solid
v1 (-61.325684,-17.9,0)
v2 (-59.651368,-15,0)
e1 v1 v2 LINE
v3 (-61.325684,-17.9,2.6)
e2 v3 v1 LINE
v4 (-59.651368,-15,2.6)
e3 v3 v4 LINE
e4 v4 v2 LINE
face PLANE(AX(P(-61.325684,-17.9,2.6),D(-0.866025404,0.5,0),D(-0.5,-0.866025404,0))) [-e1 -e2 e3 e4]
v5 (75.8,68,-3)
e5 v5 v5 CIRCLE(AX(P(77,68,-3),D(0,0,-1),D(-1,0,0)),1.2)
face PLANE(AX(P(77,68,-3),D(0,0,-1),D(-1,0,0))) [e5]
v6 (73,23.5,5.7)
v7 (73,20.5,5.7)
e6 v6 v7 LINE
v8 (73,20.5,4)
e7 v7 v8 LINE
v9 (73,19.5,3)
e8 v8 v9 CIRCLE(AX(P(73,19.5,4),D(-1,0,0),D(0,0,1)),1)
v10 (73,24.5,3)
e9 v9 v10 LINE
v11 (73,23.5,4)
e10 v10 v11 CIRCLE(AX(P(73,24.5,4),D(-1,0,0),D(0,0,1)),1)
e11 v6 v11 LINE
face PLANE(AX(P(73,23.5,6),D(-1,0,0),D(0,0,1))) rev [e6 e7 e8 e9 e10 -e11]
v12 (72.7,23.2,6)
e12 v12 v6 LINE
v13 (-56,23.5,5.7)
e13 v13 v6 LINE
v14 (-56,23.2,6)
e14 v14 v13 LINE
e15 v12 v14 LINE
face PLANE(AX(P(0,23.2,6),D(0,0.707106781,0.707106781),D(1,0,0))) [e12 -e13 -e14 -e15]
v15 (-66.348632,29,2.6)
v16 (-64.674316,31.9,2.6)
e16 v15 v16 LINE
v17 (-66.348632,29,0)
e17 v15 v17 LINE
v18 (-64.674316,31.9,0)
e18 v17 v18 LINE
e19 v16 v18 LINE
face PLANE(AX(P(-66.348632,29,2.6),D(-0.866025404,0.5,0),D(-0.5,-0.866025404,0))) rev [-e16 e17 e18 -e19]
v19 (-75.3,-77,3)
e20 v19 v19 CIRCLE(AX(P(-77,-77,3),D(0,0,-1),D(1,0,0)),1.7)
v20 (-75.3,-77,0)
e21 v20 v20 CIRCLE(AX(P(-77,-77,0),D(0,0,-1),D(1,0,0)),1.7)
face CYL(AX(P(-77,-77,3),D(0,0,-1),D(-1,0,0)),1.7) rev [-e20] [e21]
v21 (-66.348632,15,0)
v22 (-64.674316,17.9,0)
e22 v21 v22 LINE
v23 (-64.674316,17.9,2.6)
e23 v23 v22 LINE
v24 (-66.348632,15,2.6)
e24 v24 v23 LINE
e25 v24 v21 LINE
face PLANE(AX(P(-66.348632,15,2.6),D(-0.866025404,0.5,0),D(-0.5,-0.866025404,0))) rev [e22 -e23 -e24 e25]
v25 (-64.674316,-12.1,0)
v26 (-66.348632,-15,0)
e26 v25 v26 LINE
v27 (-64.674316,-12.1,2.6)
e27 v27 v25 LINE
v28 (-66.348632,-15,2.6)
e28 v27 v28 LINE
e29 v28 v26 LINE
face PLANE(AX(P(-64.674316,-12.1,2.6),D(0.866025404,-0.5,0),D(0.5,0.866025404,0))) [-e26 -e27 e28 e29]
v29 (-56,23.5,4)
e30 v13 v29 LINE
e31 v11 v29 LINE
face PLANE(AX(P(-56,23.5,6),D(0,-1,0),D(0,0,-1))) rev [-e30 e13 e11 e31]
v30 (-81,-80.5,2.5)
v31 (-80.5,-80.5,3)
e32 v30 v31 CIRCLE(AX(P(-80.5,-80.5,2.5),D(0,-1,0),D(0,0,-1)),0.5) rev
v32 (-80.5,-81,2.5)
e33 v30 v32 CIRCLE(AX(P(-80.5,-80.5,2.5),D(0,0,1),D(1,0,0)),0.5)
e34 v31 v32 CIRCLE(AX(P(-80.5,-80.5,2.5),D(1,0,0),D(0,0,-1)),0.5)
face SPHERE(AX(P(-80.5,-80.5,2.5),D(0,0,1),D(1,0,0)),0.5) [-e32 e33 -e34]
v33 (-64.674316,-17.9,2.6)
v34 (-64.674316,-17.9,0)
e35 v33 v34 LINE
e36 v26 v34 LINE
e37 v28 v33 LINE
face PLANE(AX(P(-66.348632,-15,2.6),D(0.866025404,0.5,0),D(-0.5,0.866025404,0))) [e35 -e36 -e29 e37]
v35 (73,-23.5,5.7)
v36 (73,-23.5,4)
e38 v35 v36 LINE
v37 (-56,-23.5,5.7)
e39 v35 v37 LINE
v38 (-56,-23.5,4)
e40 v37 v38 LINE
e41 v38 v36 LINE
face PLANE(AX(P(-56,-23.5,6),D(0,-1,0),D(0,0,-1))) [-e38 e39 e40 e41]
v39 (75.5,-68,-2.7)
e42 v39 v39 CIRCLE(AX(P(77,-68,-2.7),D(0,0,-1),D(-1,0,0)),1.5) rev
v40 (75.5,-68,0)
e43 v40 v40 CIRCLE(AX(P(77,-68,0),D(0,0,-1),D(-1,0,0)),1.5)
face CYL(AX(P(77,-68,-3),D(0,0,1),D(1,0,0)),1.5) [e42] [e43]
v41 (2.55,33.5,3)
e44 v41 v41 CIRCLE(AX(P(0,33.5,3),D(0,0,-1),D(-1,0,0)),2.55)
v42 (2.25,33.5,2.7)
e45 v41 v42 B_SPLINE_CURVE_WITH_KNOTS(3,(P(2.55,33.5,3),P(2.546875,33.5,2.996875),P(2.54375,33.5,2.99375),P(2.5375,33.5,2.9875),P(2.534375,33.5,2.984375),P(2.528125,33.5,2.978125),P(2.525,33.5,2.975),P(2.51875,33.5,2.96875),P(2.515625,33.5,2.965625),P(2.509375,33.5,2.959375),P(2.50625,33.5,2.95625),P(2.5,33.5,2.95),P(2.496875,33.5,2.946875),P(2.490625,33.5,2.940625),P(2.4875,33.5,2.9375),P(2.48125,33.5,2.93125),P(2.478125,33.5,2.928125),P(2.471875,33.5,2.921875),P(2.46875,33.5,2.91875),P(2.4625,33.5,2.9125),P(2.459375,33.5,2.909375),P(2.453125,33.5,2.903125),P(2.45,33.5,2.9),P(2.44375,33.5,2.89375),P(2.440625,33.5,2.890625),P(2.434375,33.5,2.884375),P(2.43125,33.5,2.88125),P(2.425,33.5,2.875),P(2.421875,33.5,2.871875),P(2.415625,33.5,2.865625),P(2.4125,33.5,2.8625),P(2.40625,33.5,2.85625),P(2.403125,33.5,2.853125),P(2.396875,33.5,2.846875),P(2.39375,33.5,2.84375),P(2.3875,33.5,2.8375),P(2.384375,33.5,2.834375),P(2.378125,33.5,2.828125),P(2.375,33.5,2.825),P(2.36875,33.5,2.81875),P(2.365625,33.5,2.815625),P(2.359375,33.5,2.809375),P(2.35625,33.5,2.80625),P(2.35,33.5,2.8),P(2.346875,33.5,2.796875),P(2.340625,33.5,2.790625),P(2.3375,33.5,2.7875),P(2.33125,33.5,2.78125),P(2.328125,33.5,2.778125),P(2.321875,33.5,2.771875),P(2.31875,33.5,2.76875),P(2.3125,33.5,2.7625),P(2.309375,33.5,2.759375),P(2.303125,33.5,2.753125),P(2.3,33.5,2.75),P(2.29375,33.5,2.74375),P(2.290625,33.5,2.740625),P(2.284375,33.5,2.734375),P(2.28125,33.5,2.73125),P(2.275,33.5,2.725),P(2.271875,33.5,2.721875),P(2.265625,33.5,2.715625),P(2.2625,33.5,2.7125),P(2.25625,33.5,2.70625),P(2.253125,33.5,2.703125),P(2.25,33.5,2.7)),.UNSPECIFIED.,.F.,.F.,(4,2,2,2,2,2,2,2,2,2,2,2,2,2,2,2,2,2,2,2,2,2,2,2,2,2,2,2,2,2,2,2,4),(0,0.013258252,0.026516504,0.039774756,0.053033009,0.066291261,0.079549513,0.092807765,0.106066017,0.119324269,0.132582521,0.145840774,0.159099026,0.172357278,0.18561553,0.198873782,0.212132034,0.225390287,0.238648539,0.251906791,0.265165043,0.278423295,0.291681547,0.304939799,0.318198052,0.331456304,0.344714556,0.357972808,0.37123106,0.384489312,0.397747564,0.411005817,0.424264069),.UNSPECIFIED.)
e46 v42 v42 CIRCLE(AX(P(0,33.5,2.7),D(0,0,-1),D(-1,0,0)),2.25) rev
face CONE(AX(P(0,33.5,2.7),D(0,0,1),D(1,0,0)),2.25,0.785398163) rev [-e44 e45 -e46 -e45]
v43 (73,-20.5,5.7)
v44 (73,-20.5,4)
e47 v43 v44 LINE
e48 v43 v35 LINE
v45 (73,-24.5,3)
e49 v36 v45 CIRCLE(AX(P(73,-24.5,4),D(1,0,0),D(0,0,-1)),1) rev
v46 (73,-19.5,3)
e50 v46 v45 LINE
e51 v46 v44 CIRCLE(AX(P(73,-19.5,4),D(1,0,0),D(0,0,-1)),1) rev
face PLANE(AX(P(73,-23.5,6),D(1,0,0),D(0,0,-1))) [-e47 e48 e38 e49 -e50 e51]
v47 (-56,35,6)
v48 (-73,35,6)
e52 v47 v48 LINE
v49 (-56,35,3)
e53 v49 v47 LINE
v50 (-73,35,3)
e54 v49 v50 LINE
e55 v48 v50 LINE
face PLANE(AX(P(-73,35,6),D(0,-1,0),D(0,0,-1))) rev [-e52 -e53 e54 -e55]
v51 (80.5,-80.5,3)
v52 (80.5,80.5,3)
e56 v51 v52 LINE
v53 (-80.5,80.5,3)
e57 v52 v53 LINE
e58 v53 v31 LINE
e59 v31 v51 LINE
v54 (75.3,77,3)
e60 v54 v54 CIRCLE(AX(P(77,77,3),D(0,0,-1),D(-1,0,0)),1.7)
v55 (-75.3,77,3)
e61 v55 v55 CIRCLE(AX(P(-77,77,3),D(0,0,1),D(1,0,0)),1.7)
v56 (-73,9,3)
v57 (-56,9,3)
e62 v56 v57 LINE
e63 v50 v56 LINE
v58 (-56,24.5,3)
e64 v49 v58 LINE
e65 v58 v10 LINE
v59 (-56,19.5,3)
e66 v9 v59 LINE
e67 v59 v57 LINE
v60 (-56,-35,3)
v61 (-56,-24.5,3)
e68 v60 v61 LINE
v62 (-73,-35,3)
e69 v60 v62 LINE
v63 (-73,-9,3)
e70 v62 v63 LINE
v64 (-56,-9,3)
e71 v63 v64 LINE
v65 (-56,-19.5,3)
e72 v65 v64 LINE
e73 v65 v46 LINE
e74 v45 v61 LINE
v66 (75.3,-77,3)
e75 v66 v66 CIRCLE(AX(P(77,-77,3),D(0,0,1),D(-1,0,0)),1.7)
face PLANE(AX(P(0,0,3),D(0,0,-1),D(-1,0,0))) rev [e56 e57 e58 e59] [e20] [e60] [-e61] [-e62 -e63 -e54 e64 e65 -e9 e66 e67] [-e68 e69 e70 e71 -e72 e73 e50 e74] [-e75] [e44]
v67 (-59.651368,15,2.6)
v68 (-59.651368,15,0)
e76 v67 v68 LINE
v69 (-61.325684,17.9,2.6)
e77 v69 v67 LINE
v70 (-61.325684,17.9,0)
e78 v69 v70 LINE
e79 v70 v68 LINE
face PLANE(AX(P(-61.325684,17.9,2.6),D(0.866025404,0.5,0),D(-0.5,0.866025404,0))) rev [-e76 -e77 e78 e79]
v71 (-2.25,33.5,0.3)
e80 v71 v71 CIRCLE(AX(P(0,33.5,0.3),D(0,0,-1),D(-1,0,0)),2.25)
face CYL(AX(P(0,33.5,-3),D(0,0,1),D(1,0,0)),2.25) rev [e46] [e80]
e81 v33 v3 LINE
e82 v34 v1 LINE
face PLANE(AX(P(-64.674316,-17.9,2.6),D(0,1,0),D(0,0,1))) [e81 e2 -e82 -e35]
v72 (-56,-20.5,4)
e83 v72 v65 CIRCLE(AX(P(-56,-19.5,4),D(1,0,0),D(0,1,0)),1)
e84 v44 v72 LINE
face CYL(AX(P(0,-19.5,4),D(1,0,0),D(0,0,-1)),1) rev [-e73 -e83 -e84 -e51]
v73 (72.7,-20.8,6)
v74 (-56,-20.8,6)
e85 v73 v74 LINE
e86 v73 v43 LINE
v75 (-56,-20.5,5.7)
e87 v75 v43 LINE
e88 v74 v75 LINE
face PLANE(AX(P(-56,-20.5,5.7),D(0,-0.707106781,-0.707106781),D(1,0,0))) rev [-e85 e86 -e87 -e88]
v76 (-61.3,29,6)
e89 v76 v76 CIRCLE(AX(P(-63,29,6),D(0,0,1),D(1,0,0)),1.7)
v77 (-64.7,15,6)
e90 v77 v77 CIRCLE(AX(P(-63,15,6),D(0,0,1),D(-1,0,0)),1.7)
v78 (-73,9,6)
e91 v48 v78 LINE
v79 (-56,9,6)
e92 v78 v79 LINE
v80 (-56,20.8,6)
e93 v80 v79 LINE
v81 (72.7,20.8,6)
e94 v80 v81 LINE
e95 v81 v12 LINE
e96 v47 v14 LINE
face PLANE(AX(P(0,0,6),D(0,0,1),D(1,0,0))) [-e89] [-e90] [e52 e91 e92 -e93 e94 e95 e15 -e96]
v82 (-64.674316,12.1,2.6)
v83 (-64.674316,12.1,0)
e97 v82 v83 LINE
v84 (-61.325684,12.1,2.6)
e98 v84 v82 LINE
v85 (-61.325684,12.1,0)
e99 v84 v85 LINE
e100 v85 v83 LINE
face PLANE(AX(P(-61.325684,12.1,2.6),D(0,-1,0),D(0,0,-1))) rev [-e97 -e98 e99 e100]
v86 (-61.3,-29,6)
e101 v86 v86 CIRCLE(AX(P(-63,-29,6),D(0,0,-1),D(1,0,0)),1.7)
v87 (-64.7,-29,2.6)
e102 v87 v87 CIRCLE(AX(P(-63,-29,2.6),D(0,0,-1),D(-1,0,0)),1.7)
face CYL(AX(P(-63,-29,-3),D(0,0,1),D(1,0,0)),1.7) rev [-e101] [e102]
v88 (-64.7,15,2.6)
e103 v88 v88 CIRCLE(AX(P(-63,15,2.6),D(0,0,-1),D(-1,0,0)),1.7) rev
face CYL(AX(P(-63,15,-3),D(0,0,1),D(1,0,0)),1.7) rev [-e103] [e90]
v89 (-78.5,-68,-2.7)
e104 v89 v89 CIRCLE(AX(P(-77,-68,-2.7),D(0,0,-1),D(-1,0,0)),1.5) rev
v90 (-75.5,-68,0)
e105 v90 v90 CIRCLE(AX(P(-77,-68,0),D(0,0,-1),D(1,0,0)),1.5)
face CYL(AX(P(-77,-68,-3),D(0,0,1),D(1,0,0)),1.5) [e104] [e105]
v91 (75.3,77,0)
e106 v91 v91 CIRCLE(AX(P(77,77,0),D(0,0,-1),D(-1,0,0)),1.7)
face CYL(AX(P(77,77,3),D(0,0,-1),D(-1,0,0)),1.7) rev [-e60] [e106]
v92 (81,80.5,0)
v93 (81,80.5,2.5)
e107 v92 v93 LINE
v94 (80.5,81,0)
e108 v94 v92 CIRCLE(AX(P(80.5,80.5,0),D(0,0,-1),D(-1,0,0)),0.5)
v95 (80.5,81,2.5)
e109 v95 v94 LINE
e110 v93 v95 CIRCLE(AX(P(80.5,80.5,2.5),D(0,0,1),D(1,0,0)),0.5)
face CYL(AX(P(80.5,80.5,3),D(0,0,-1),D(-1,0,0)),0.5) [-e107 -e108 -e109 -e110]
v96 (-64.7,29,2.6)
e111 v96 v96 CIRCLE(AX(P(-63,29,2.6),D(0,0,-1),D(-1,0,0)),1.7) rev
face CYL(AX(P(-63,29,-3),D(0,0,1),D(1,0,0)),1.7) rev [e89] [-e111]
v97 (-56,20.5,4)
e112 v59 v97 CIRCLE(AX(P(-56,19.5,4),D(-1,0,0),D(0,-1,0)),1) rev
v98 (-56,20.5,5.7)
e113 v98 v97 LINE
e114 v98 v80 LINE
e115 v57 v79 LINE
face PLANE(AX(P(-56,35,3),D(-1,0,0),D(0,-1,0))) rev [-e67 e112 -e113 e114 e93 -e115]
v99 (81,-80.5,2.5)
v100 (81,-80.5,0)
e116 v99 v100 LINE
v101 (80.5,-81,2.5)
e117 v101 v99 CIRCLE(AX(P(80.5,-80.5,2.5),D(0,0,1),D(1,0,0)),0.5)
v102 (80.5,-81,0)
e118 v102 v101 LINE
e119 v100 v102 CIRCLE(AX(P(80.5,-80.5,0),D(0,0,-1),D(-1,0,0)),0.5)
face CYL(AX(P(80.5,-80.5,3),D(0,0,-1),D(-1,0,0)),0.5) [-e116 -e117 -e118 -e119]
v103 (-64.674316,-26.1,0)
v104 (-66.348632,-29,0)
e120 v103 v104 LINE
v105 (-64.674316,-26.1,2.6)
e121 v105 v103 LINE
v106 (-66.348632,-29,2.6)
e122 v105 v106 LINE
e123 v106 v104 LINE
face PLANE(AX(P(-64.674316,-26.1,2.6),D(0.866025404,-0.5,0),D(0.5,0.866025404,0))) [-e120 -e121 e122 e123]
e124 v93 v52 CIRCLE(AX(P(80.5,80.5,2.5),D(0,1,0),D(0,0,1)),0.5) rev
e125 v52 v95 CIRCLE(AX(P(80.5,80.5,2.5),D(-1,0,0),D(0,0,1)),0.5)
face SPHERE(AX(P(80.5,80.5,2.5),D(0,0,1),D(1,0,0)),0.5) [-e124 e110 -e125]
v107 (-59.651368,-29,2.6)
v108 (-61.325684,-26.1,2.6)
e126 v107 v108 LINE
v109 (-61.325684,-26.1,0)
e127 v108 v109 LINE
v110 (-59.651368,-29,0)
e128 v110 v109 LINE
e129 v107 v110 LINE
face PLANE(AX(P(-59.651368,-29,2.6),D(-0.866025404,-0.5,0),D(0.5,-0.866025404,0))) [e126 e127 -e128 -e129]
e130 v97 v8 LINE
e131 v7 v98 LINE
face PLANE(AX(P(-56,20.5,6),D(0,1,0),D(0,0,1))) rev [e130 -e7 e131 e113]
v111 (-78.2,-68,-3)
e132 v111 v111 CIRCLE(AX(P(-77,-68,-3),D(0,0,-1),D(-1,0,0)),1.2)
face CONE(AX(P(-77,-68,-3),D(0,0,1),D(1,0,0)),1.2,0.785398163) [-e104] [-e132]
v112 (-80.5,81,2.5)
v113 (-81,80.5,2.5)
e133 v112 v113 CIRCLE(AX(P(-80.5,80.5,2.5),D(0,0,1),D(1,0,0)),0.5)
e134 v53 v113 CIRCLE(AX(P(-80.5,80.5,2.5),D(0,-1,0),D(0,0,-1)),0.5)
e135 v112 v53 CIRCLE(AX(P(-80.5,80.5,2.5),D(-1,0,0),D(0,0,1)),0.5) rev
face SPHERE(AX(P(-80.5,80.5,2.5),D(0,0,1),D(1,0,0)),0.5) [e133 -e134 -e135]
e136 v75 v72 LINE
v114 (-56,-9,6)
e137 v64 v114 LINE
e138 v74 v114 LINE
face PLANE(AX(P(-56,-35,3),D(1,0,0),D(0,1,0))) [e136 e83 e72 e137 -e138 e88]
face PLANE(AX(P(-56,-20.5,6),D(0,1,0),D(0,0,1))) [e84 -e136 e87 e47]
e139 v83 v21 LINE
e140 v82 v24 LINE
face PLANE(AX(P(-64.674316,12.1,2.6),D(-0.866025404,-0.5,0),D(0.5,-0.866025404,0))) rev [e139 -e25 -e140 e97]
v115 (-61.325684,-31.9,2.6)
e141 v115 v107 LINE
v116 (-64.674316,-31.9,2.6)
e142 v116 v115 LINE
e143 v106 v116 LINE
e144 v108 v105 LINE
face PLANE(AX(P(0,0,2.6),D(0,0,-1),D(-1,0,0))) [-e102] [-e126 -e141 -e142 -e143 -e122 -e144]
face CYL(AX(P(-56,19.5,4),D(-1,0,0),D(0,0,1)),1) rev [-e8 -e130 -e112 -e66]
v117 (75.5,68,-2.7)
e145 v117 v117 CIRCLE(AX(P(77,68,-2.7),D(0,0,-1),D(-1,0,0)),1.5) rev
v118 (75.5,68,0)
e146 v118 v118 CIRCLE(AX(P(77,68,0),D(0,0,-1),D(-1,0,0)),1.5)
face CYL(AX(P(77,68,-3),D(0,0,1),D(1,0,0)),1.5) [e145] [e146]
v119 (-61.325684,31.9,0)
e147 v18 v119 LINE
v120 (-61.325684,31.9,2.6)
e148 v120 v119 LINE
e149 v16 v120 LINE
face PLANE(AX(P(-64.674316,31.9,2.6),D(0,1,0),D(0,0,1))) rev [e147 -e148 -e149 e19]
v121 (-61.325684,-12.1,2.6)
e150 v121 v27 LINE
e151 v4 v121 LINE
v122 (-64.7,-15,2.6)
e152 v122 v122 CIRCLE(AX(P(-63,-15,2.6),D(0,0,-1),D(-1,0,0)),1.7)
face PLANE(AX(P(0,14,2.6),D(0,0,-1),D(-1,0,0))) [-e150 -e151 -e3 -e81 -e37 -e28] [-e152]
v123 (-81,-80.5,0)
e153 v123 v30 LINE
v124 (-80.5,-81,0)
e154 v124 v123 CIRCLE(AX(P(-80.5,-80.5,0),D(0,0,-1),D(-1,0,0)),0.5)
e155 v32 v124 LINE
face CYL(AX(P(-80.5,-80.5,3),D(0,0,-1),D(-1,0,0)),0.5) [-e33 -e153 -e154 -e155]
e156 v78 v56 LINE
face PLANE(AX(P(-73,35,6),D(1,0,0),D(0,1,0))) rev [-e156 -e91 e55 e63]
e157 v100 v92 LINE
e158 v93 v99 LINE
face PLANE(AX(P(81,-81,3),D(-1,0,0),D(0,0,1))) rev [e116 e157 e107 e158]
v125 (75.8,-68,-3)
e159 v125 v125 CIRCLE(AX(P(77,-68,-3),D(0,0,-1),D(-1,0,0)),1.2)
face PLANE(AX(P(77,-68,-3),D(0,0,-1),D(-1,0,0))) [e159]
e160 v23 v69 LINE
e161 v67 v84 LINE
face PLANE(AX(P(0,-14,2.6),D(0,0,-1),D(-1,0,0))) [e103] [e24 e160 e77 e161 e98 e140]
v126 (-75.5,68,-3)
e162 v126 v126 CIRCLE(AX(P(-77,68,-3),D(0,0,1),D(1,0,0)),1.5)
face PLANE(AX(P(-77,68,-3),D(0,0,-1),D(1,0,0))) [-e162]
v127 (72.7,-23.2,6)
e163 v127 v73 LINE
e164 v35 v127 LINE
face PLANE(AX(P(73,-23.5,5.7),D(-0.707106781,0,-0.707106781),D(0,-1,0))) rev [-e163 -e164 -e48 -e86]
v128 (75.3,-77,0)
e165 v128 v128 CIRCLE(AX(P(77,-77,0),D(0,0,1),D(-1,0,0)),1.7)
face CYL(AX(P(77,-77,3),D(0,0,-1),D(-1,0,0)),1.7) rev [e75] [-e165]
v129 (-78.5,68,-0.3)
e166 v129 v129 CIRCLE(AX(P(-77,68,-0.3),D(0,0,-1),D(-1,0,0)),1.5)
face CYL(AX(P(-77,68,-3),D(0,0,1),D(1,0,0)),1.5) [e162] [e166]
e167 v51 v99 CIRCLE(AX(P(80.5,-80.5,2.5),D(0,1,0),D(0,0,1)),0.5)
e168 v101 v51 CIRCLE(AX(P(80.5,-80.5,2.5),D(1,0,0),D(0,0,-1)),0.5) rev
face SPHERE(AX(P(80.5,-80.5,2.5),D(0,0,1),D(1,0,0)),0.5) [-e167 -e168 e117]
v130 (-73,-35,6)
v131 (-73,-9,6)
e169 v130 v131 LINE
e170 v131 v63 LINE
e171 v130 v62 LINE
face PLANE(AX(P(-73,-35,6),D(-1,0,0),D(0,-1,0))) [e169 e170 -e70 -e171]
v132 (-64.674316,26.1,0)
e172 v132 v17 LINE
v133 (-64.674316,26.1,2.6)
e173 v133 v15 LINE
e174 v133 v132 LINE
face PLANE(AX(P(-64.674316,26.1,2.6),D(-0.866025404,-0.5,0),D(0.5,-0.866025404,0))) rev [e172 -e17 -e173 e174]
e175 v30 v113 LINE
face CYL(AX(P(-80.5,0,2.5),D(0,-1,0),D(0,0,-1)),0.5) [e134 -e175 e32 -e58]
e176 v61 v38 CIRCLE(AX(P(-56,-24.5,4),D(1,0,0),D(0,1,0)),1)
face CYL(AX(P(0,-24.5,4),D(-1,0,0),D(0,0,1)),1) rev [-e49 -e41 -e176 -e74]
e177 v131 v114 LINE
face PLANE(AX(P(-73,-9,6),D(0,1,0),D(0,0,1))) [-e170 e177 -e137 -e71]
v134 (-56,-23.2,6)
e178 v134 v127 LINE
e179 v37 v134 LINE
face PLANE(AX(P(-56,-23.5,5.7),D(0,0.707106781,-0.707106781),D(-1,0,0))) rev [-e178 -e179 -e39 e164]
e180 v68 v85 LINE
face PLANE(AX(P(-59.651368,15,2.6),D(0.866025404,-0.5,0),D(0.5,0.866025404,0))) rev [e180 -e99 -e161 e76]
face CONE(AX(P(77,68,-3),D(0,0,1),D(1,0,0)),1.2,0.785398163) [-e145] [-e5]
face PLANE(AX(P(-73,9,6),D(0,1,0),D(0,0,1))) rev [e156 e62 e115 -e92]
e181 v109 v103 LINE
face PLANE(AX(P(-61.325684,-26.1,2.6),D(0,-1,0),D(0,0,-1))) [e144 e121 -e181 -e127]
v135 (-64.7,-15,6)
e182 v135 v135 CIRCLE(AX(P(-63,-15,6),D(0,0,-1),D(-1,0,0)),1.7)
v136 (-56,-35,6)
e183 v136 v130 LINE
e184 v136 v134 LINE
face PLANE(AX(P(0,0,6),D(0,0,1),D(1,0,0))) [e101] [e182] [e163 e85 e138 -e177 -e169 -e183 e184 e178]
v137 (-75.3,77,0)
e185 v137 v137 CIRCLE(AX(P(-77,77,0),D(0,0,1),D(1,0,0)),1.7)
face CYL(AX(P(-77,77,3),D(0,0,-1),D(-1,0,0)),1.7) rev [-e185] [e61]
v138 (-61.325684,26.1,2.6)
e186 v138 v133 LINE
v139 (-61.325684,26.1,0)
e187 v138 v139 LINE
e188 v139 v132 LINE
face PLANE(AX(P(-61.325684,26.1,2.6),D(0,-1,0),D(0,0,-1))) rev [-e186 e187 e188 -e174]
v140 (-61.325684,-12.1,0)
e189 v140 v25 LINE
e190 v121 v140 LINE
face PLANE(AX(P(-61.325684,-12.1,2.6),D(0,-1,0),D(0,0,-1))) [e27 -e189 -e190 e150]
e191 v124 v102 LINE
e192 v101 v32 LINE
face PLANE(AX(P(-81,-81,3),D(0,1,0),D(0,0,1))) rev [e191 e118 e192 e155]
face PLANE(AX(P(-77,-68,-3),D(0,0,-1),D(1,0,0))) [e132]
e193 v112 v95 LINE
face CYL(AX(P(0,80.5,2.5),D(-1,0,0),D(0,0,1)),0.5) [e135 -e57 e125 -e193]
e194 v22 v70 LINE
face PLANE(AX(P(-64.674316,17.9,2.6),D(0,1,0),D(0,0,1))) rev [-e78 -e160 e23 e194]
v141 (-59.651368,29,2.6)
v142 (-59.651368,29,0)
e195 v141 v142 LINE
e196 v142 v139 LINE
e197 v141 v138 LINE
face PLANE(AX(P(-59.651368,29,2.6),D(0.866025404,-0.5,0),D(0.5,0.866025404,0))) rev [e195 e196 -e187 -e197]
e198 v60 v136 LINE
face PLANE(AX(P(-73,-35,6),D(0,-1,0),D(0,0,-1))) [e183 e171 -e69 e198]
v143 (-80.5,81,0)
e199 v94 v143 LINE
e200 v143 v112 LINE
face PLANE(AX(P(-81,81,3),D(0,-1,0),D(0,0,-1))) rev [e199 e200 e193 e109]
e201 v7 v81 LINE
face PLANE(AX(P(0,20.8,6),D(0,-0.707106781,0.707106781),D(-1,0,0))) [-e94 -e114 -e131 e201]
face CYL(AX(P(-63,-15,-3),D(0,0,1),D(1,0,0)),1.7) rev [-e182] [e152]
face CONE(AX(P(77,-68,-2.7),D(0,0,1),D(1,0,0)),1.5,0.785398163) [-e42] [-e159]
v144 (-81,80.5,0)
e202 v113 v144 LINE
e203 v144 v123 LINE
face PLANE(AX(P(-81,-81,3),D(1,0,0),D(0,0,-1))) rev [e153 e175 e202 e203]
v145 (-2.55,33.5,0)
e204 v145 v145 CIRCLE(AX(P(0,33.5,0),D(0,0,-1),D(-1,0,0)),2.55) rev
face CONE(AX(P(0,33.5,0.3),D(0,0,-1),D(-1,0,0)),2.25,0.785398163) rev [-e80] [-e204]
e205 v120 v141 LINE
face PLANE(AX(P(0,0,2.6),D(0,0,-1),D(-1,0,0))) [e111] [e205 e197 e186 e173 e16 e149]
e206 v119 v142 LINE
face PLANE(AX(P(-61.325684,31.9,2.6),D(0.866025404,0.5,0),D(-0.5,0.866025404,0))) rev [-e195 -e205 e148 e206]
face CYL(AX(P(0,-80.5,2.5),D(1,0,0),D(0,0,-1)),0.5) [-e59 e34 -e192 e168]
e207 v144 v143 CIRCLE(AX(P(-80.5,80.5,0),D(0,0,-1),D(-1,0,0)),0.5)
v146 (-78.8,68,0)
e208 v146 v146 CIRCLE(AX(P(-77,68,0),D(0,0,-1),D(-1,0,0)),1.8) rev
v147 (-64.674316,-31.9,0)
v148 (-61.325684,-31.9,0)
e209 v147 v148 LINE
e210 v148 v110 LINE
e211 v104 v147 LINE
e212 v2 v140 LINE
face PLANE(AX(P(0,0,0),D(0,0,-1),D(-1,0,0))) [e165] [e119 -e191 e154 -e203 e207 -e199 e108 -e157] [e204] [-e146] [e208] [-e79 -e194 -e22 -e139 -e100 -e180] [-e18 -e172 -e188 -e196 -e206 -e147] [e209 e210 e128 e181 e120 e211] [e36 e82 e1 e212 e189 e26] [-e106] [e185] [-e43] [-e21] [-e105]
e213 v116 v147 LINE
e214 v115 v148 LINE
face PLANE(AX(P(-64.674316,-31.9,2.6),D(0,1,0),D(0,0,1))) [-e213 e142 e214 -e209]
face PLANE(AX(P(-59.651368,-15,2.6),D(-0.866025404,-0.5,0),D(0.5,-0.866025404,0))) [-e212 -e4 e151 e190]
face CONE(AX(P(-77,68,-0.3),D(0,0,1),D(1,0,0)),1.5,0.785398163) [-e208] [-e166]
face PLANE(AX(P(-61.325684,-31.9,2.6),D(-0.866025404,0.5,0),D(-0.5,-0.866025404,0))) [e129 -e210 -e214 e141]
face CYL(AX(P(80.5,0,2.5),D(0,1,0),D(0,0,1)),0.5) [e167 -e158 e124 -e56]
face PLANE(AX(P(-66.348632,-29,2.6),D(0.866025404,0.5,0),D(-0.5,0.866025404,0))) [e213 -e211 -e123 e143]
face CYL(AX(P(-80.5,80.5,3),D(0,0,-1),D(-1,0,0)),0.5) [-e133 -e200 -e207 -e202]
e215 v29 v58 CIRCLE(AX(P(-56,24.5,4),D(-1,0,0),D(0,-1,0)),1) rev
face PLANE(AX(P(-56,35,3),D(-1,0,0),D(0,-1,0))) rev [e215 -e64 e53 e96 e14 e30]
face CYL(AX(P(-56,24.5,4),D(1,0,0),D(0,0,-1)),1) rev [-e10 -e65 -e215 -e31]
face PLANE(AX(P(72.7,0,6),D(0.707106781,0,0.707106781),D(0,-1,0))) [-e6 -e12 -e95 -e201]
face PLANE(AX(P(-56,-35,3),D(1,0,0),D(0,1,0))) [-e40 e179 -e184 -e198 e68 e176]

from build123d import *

# Parameters (mm, degrees)
SKETCH_1_W                                  = 162
SKETCH_1_H                                  = 162
EXTRUDE_309_DEPTH                           = 3
SKETCH_2_R                                  = 1.5
EXTRUDE_522_DEPTH                           = 3
MIRROR_568_AT_THE_SECOND_PLANE_COPY_1_SK_R  = 1.5
MIRROR_568_AT_THE_SECOND_PLANE_COPY_1_DEPTH = 3
CHAMFER_595_SIZE                            = 0.3
SKETCH_3_R                                  = 1.7
CUT_EXTRUDE_885_DEPTH                       = 115.590575529
MIRROR_923_AT_THE_SECOND_PLANE_COPY_1_SK_R  = 1.7
MIRROR_923_AT_THE_SECOND_PLANE_COPY_1_DEPTH = 115.590575529
SKETCH_4_W                                  = 20
SKETCH_4_H                                  = 26
EXTRUDE_1171_DEPTH                          = 3
SKETCH_5_R                                  = 1.7
CUT_EXTRUDE_1430_DEPTH                      = 115.904308013
SKETCH_6_R                                  = 2.25
CUT_EXTRUDE_1848_DEPTH                      = 115.708325766
CUT_EXTRUDE_2245_DEPTH                      = 2.6
PATTERN_LINEAR_2_COUNT                      = 2
PATTERN_LINEAR_2_PITCH                      = 14
MIRROR_2370_COPY_1_DEPTH                    = 2.6
SKETCH_8_W                                  = 3
SKETCH_8_H                                  = 26
CUT_EXTRUDE_2563_DEPTH                      = 3
SKETCH_10_W                                 = 129
SKETCH_10_H                                 = 3
EXTRUDE_3082_DEPTH                          = 3
FILLET_2_R                                  = 1
CHAMFER_2_SIZE                              = 0.3
CHAMFER_3_SIZE                              = 0.3
CHAMFER_4_SIZE                              = 0.3
FILLET_3_R                                  = 0.5
FILLET_5_R                                  = 0.5


with BuildPart() as part:
    # Эскиз1 → Extrude 309 (new body)
    with BuildSketch(Plane.XY):
        Rectangle(SKETCH_1_W, SKETCH_1_H)
    extrude(amount=EXTRUDE_309_DEPTH)

    # Эскиз2 → Extrude 522 (add)
    with BuildSketch(Plane(origin=(0, 0, 0), x_dir=(-1, 0, 0), z_dir=(0, 0, -1))):
        with Locations((-77, 68)):
            Circle(SKETCH_2_R)
    extrude_522 = extrude(amount=EXTRUDE_522_DEPTH)

    # Mirror 568: Extrude 522 across plane
    add(extrude_522.mirror(Plane(origin=(0, 0, 0), x_dir=(0, 0, 1), z_dir=(1, 0, 0))))

    # Mirror 568 at the second plane: Extrude 522 across plane
    add(extrude_522.mirror(Plane.ZX))

    # Mirror 568 at the second plane copy 1 sk → Mirror 568 at the second plane copy 1 (add)
    with BuildSketch(Plane(origin=(0, 0, 0), x_dir=(1, 0, 0), z_dir=(0, 0, -1))):
        with Locations((-77, 68)):
            Circle(MIRROR_568_AT_THE_SECOND_PLANE_COPY_1_SK_R)
    extrude(amount=MIRROR_568_AT_THE_SECOND_PLANE_COPY_1_DEPTH)

    # Chamfer 595
    chamfer_595_edges = [part.edges().sort_by_distance(p)[0] for p in [
        (78.5, 68, -3),
        (78.5, -68, -3),
        (-78.5, 68, 0),
        (-78.5, -68, -3),
    ]]
    chamfer(chamfer_595_edges, length=CHAMFER_595_SIZE)

    # Эскиз3 → Cut-Extrude 885 (cut, through all)
    with BuildSketch(Plane(origin=(0, 0, 0), x_dir=(-1, 0, 0), z_dir=(0, 0, -1))):
        with Locations((-77, 77)):
            Circle(SKETCH_3_R)
    cut_extrude_885 = extrude(amount=-CUT_EXTRUDE_885_DEPTH, mode=Mode.SUBTRACT)

    # Mirror 923: Cut-Extrude 885 across plane
    add(cut_extrude_885.mirror(Plane(origin=(0, 0, 0), x_dir=(0, 0, 1), z_dir=(1, 0, 0))), mode=Mode.SUBTRACT)

    # Mirror 923 at the second plane: Cut-Extrude 885 across plane
    add(cut_extrude_885.mirror(Plane.ZX), mode=Mode.SUBTRACT)

    # Mirror 923 at the second plane copy 1 sk → Mirror 923 at the second plane copy 1 (cut, through all)
    with BuildSketch(Plane(origin=(0, 0, 0), x_dir=(1, 0, 0), z_dir=(0, 0, -1))):
        with Locations((-77, 77)):
            Circle(MIRROR_923_AT_THE_SECOND_PLANE_COPY_1_SK_R)
    extrude(amount=-MIRROR_923_AT_THE_SECOND_PLANE_COPY_1_DEPTH, mode=Mode.SUBTRACT)

    # Эскиз4 → Extrude 1171 (add)
    with BuildSketch(Plane.XY.offset(3)):
        with Locations((-63, 22)):
            Rectangle(SKETCH_4_W, SKETCH_4_H)
    extrude_1171 = extrude(amount=EXTRUDE_1171_DEPTH)

    # Эскиз5 → Cut-Extrude 1430 (cut, through all)
    with BuildSketch(Plane.XY.offset(6)):
        with Locations((-63, 29)):
            Circle(SKETCH_5_R)
        with Locations(Location((-63, 15, 0), (0, 0, 180))):
            Circle(SKETCH_5_R)
    cut_extrude_1430 = extrude(amount=-CUT_EXTRUDE_1430_DEPTH, mode=Mode.SUBTRACT)

    # Зеркальное отражение3: Extrude 1171, Cut-Extrude 1430 across plane
    add(extrude_1171.mirror(Plane.ZX))
    add(cut_extrude_1430.mirror(Plane.ZX), mode=Mode.SUBTRACT)

    # Эскиз6 → Cut-Extrude 1848 (cut, through all)
    with BuildSketch(Plane.XY.offset(3)):
        with Locations((0, 33.5)):
            Circle(SKETCH_6_R)
    extrude(amount=-CUT_EXTRUDE_1848_DEPTH, mode=Mode.SUBTRACT)

    # Эскиз7 → Cut-Extrude 2245 (cut)
    with BuildSketch(Plane(origin=(0, 0, 0), x_dir=(-1, 0, 0), z_dir=(0, 0, -1))):
        Polygon((66.348631561, 29), (64.674315781, 31.9), (61.325684219, 31.9), (59.651368439, 29), (61.325684219, 26.1), (64.674315781, 26.1), align=None)
    cut_extrude_2245 = extrude(amount=-CUT_EXTRUDE_2245_DEPTH, mode=Mode.SUBTRACT)

    # Карман2: Cut-Extrude 2245 ×2
    with Locations(*[(0, -i * PATTERN_LINEAR_2_PITCH, 0) for i in range(1, PATTERN_LINEAR_2_COUNT)]):
        add(cut_extrude_2245, mode=Mode.SUBTRACT)

    # Mirror 2370: Cut-Extrude 2245 across plane
    add(cut_extrude_2245.mirror(Plane.ZX), mode=Mode.SUBTRACT)

    # Mirror 2370 copy 1 sketch → Mirror 2370 copy 1 (cut)
    with BuildSketch(Plane(origin=(0, 14, 0), x_dir=(-1, 0, 0), z_dir=(0, 0, -1))):
        Polygon((66.348631561, -29), (64.674315781, -31.9), (61.325684219, -31.9), (59.651368439, -29), (61.325684219, -26.1), (64.674315781, -26.1), align=None)
    extrude(amount=-MIRROR_2370_COPY_1_DEPTH, mode=Mode.SUBTRACT)

    # Эскиз8 → Cut-Extrude 2563 (cut)
    with BuildSketch(Plane.XY.offset(6)):
        with Locations((-54.5, 22)):
            Rectangle(SKETCH_8_W, SKETCH_8_H)
    cut_extrude_2563 = extrude(amount=-CUT_EXTRUDE_2563_DEPTH, mode=Mode.SUBTRACT)

    # Mirror 2615: Cut-Extrude 2563 across plane
    add(cut_extrude_2563.mirror(Plane.ZX), mode=Mode.SUBTRACT)

    # Эскиз10 → Extrude 3082 (add)
    with BuildSketch(Plane.XY.offset(3)):
        with Locations((8.5, 22)):
            Rectangle(SKETCH_10_W, SKETCH_10_H)
    extrude_3082 = extrude(amount=EXTRUDE_3082_DEPTH)

    # Mirror 3134: Extrude 3082 across plane
    add(extrude_3082.mirror(Plane.ZX))

    # Скругление2
    fillet_2_edges = [part.edges().sort_by_distance(p)[0] for p in [
        (8.5, 23.5, 3),
        (8.5, 20.5, 3),
        (8.5, -23.5, 3),
        (8.5, -20.5, 3),
    ]]
    fillet(fillet_2_edges, radius=FILLET_2_R)

    # Фаска2
    chamfer_2_edges = [part.edges().sort_by_distance(p)[0] for p in [
        (8.5, 23.5, 6),
        (8.5, 20.5, 6),
        (8.5, -20.5, 6),
        (8.5, -23.5, 6),
    ]]
    chamfer(chamfer_2_edges, length=CHAMFER_2_SIZE)

    # Фаска3
    chamfer_3_edges = [part.edges().sort_by_distance(p)[0] for p in [
        (73, 22, 6),
        (73, -22, 6),
    ]]
    chamfer(chamfer_3_edges, length=CHAMFER_3_SIZE)

    # Фаска4
    chamfer_4_edges = [part.edges().sort_by_distance(p)[0] for p in [
        (-2.25, 33.5, 0),
        (-2.25, 33.5, 3),
    ]]
    chamfer(chamfer_4_edges, length=CHAMFER_4_SIZE)

    # Скругление3
    fillet_3_edges = [part.edges().sort_by_distance(p)[0] for p in [
        (-81, 0, 3),
        (0, -81, 3),
        (81, 0, 3),
        (0, 81, 3),
    ]]
    fillet(fillet_3_edges, radius=FILLET_3_R)

    # Скругление5
    # the kernel refuses this fillet: 0.5 mm, written as the material it takes off along each edge
    with BuildSketch(Plane(origin=(-80.5, 80.5, 2.5), x_dir=(0, 1, 0), z_dir=(-1, 0, 0))) as fillet_5_piece_1_section:
        Polygon((0, 0), (FILLET_5_R, 0), (FILLET_5_R, -FILLET_5_R), (0, -FILLET_5_R), align=None)
    fillet_5_piece_1 = extrude(amount=FILLET_5_R, mode=Mode.PRIVATE)
    fillet_5_piece_1 = fillet_5_piece_1 - Plane(origin=(-80.5, 80.5, 2.5), x_dir=(0, -0.7071067811865475, -0.7071067811865475), z_dir=(-1, 0, 0)) * Sphere(FILLET_5_R, mode=Mode.PRIVATE)
    add(fillet_5_piece_1, mode=Mode.SUBTRACT)
    with BuildSketch(Plane(origin=(80.5, 80.5, 2.5), x_dir=(1, 0, 0), z_dir=(0, 1, 0))) as fillet_5_piece_2_section:
        Polygon((0, 0), (FILLET_5_R, 0), (FILLET_5_R, -FILLET_5_R), (0, -FILLET_5_R), align=None)
    fillet_5_piece_2 = extrude(amount=FILLET_5_R, mode=Mode.PRIVATE)
    fillet_5_piece_2 = fillet_5_piece_2 - Plane(origin=(80.5, 80.5, 2.5), x_dir=(-0.7071067811865475, 0, -0.7071067811865475), z_dir=(0, 1, 0)) * Sphere(FILLET_5_R, mode=Mode.PRIVATE)
    add(fillet_5_piece_2, mode=Mode.SUBTRACT)
    with BuildSketch(Plane(origin=(-80.5, -80.5, 2.5), x_dir=(0, -1, 0), z_dir=(-1, 0, 0))) as fillet_5_piece_3_section:
        Polygon((0, 0), (FILLET_5_R, 0), (FILLET_5_R, FILLET_5_R), (0, FILLET_5_R), align=None)
    fillet_5_piece_3 = extrude(amount=FILLET_5_R, mode=Mode.PRIVATE)
    fillet_5_piece_3 = fillet_5_piece_3 - Plane(origin=(-80.5, -80.5, 2.5), x_dir=(0, 0.7071067811865475, -0.7071067811865475), z_dir=(-1, 0, 0)) * Sphere(FILLET_5_R, mode=Mode.PRIVATE)
    add(fillet_5_piece_3, mode=Mode.SUBTRACT)
    with BuildSketch(Plane(origin=(80.5, -80.5, 2.5), x_dir=(1, 0, 0), z_dir=(0, -1, 0))) as fillet_5_piece_4_section:
        Polygon((0, 0), (FILLET_5_R, 0), (FILLET_5_R, FILLET_5_R), (0, FILLET_5_R), align=None)
    fillet_5_piece_4 = extrude(amount=FILLET_5_R, mode=Mode.PRIVATE)
    fillet_5_piece_4 = fillet_5_piece_4 - Plane(origin=(80.5, -80.5, 2.5), x_dir=(-0.7071067811865475, 0, -0.7071067811865475), z_dir=(0, -1, 0)) * Sphere(FILLET_5_R, mode=Mode.PRIVATE)
    add(fillet_5_piece_4, mode=Mode.SUBTRACT)
    with BuildSketch(Plane(origin=(81, -81, -1.25), x_dir=(-1, 0, 0), z_dir=(0, 0, 1)), Plane(origin=(-81, -81, -1.25), x_dir=(0, 1, 0), z_dir=(0, 0, 1))) as fillet_5_piece_5:
        with BuildLine():
            CenterArc((FILLET_5_R, -FILLET_5_R), FILLET_5_R, 90, 90)
            Line((0, -FILLET_5_R), (0, 0))
            Line((0, 0), (FILLET_5_R, 0))
        make_face()
    extrude(amount=3.75, mode=Mode.SUBTRACT)
    with BuildSketch(Plane(origin=(81, 81, -1.25), x_dir=(-1, 0, 0), z_dir=(0, 0, 1)), Plane(origin=(-81, 81, -1.25), x_dir=(0, -1, 0), z_dir=(0, 0, 1))) as fillet_5_piece_6:
        with BuildLine():
            CenterArc((FILLET_5_R, FILLET_5_R), FILLET_5_R, 180, 90)
            Line((0, FILLET_5_R), (0, 0))
            Line((0, 0), (FILLET_5_R, 0))
        make_face()
    extrude(amount=3.75, mode=Mode.SUBTRACT)


solid = part.part
